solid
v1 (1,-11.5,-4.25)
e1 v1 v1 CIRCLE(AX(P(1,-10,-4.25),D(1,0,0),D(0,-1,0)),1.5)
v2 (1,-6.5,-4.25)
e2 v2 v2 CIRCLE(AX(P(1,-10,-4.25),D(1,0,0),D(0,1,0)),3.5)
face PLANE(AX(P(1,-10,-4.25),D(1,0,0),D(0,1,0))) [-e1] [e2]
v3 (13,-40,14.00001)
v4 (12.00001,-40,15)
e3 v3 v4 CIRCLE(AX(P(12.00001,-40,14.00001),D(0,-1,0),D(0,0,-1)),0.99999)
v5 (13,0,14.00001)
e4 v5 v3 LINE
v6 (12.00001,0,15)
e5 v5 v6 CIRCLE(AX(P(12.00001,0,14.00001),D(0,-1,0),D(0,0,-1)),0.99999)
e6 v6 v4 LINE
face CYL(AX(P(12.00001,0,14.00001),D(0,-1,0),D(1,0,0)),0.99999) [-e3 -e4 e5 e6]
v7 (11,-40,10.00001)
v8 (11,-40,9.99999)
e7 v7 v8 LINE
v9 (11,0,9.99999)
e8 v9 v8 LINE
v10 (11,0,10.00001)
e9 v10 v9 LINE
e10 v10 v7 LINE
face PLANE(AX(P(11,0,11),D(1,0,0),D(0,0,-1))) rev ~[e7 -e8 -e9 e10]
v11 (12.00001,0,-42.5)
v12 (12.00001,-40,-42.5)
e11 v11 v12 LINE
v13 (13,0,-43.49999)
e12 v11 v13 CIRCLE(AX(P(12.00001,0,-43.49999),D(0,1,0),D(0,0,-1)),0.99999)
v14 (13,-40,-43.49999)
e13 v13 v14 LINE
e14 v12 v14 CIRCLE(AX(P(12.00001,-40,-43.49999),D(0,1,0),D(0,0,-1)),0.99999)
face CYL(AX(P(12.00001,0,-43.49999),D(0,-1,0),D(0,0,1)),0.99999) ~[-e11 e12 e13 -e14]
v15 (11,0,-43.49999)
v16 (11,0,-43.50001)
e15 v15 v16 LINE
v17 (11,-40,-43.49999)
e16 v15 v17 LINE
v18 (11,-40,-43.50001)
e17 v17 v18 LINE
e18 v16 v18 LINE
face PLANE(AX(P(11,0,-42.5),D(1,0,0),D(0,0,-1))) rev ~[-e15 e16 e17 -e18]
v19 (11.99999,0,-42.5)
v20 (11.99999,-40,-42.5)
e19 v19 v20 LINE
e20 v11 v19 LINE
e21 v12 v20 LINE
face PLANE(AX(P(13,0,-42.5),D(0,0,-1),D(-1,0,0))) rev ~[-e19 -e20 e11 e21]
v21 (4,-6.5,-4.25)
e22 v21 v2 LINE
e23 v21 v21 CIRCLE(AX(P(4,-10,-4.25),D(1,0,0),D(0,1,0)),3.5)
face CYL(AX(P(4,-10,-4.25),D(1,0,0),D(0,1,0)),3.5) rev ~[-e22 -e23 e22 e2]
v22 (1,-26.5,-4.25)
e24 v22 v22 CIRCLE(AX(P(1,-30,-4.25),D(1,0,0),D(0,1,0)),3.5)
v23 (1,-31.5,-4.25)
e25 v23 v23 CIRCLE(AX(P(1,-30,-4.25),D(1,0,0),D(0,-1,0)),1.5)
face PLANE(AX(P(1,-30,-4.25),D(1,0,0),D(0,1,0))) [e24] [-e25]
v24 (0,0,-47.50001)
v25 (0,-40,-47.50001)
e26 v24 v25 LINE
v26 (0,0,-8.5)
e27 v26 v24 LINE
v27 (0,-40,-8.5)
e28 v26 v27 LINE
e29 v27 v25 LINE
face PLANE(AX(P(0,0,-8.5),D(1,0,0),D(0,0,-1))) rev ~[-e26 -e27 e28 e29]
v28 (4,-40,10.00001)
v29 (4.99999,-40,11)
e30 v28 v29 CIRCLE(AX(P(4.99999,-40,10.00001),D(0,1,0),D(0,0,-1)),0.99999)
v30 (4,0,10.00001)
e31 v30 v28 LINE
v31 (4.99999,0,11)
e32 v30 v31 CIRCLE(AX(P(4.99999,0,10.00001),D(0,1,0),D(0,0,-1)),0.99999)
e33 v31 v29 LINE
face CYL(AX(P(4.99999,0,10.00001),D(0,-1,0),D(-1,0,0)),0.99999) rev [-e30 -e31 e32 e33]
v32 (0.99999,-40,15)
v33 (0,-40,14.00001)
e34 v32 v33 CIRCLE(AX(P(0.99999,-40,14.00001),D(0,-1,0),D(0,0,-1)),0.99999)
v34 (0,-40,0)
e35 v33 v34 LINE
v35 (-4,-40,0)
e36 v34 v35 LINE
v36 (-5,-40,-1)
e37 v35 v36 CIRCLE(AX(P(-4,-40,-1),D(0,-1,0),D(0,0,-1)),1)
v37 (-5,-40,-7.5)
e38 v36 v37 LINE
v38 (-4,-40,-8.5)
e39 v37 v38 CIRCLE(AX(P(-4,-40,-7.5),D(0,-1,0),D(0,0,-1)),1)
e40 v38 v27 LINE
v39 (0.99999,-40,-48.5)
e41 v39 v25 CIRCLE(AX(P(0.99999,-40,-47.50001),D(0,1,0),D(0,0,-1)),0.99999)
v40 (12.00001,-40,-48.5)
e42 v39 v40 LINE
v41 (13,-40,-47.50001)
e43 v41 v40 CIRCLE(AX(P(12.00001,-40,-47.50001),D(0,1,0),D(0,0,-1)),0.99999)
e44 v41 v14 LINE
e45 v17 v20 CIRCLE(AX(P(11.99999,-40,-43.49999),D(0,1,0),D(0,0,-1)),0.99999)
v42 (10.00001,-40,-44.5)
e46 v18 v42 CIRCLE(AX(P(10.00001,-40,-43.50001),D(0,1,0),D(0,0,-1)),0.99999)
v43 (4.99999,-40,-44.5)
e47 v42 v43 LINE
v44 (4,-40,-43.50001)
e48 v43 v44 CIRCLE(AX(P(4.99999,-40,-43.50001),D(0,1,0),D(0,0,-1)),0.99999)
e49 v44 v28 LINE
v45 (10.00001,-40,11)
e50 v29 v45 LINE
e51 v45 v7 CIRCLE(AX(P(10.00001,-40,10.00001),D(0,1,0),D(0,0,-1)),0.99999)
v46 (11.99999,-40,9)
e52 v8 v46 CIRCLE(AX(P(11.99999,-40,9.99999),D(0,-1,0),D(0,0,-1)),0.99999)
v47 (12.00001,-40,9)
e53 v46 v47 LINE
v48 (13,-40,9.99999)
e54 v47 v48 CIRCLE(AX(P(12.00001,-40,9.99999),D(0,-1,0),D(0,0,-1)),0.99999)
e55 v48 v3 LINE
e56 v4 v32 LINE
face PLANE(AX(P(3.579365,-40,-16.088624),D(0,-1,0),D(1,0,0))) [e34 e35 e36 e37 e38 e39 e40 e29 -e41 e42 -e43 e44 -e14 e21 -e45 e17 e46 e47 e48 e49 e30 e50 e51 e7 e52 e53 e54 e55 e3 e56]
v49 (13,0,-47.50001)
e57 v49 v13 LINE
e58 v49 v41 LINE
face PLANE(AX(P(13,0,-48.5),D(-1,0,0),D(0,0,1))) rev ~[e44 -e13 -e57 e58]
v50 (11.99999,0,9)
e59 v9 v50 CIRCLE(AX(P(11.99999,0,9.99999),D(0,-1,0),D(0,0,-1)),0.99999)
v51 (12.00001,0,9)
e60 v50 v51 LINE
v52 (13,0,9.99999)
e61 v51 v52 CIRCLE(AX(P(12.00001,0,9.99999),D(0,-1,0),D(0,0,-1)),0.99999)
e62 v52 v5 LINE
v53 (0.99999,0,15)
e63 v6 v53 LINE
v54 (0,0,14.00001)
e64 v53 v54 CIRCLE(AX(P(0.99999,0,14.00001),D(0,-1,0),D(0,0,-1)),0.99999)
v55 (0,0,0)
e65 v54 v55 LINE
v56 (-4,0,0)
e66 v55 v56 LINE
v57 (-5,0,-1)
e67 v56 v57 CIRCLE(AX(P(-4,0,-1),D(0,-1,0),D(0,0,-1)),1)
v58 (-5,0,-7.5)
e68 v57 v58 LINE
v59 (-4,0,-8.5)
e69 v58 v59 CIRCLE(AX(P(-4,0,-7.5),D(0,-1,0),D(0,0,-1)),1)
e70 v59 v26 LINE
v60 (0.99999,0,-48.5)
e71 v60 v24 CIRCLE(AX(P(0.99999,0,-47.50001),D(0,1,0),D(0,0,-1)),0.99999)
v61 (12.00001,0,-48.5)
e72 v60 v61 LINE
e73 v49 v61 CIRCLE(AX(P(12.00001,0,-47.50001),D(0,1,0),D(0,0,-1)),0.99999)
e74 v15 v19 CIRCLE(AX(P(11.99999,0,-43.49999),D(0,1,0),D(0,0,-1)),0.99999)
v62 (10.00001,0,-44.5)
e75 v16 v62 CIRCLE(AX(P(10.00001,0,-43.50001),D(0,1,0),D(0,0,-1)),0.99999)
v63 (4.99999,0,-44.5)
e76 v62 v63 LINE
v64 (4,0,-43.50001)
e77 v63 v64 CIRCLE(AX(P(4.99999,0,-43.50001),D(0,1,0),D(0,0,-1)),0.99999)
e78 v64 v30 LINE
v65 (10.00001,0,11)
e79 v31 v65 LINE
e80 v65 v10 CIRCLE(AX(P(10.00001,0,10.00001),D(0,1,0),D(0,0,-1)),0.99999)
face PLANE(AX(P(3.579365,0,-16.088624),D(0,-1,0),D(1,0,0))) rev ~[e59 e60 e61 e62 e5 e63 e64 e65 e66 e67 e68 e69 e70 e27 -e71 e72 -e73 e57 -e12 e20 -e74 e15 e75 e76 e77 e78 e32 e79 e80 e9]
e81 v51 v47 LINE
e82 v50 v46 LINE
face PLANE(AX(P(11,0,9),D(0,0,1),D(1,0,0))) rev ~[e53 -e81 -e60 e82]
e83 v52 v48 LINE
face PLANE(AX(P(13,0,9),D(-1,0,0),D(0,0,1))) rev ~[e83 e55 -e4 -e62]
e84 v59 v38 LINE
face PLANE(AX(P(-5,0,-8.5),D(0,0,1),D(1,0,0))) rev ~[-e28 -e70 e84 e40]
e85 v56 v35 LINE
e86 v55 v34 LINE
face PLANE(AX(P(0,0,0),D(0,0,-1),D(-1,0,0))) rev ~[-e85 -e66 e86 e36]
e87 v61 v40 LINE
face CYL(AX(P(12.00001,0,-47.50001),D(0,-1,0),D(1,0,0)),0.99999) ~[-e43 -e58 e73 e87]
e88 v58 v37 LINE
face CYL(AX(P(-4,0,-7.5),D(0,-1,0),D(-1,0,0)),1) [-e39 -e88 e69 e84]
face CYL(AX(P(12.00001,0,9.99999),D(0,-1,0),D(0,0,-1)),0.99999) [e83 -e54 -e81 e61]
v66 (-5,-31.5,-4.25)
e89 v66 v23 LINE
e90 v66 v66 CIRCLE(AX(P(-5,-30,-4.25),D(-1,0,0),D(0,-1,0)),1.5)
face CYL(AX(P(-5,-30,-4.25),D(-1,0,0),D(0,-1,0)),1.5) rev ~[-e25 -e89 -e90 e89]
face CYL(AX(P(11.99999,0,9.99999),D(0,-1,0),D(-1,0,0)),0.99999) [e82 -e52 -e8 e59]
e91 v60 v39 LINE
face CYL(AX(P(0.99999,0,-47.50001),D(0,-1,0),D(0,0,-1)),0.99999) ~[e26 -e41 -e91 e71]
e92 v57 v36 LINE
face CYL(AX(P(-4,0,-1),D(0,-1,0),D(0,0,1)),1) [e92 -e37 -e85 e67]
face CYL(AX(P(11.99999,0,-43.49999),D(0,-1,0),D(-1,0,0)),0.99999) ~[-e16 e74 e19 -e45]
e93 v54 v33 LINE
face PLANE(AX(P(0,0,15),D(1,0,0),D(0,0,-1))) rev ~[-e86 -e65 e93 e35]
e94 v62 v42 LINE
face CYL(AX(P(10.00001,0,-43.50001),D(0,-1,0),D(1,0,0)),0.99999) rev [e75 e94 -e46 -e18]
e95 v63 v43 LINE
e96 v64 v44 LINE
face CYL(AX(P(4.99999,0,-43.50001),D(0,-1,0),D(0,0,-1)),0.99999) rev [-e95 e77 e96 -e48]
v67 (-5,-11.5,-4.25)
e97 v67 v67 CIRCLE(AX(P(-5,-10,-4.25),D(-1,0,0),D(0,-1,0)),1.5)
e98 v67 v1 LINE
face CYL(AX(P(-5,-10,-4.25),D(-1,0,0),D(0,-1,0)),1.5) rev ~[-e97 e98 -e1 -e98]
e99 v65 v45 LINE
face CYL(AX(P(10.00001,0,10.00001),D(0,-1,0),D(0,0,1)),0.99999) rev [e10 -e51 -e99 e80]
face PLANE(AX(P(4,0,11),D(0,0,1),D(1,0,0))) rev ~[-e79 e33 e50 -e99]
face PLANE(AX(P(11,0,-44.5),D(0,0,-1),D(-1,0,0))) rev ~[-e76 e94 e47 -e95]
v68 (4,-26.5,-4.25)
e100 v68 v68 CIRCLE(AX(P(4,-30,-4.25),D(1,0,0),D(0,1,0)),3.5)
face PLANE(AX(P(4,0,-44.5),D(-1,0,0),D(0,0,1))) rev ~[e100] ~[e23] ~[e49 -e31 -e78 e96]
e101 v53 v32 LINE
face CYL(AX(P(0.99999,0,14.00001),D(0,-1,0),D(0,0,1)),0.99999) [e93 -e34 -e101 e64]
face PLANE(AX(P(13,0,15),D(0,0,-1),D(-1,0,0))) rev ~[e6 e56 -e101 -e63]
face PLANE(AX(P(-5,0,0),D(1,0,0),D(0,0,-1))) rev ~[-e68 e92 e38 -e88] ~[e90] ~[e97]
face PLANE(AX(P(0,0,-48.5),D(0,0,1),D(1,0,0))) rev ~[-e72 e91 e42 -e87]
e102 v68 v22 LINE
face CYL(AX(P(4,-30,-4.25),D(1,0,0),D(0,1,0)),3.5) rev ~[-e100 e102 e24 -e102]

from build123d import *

# Parameters (mm, degrees)
F1_DEPTH = 40
F2_R     = 1.5
F3_DEPTH = 25
F5_R     = 1
F4_R     = 3.5
F4_R_2   = 1.5
F6_DEPTH = 3
F7_R     = 0.99999


# Not quite as in the source:
# - a fillet or chamfer is up to 0.001 mm smaller than in the source, because OpenCascade refuses the exact size


with BuildPart() as f1:
    # F0 (on Front) → F1 (new body)
    with BuildSketch(Plane.XZ):
        Polygon((13, 15), (0, 15), (0, 0), (-5, 0), (-5, -8.5), (0, -8.5), (0, -48.5), (13, -48.5), (13, -42.5), (11, -42.5), (11, -44.5), (4, -44.5), (4, 11), (11, 11), (11, 9), (13, 9), align=None)
    extrude(amount=F1_DEPTH)

    # F2 (on face) → F3 (cut)
    with BuildSketch(Plane(origin=(-5, 0, 0), x_dir=(0, -1, 0), z_dir=(-1, 0, 0))):
        with Locations((10, -4.25)):
            Circle(F2_R)
        with Locations((30, -4.25)):
            Circle(F2_R)
    extrude(amount=-F3_DEPTH, mode=Mode.SUBTRACT)

    # F5
    f5_edges = [f1.edges().sort_by_distance(p)[0] for p in [
        (-5, -20, 0),
        (-5, -20, -8.5),
    ]]
    fillet(f5_edges, radius=F5_R)

    # F4 (on face) → F6 (cut)
    with BuildSketch(Plane.YZ.offset(4)):
        with Locations((-10, -4.25)):
            Circle(F4_R)
        with Locations((-10, -4.25)):
            Circle(F4_R_2, mode=Mode.SUBTRACT)
        with Locations((-30, -4.25)):
            Circle(F4_R)
        with Locations((-30, -4.25)):
            Circle(F4_R_2, mode=Mode.SUBTRACT)
    extrude(amount=-F6_DEPTH, mode=Mode.SUBTRACT)

    # F7 (radius 1 in the source; OpenCascade refuses exactly that, so slightly less here)
    f7_edges = [f1.edges().sort_by_distance(p)[0] for p in [
        (13, -20, 9),
        (11, -20, 9),
        (13, -20, 15),
        (0, -20, 15),
        (4, -20, 11),
        (0, -20, -48.5),
        (13, -20, -48.5),
        (13, -20, -42.5),
        (4, -20, -44.5),
        (11, -20, -42.5),
        (11, -20, -44.5),
        (11, -20, 11),
    ]]
    fillet(f7_edges, radius=F7_R)


solid = f1.part
